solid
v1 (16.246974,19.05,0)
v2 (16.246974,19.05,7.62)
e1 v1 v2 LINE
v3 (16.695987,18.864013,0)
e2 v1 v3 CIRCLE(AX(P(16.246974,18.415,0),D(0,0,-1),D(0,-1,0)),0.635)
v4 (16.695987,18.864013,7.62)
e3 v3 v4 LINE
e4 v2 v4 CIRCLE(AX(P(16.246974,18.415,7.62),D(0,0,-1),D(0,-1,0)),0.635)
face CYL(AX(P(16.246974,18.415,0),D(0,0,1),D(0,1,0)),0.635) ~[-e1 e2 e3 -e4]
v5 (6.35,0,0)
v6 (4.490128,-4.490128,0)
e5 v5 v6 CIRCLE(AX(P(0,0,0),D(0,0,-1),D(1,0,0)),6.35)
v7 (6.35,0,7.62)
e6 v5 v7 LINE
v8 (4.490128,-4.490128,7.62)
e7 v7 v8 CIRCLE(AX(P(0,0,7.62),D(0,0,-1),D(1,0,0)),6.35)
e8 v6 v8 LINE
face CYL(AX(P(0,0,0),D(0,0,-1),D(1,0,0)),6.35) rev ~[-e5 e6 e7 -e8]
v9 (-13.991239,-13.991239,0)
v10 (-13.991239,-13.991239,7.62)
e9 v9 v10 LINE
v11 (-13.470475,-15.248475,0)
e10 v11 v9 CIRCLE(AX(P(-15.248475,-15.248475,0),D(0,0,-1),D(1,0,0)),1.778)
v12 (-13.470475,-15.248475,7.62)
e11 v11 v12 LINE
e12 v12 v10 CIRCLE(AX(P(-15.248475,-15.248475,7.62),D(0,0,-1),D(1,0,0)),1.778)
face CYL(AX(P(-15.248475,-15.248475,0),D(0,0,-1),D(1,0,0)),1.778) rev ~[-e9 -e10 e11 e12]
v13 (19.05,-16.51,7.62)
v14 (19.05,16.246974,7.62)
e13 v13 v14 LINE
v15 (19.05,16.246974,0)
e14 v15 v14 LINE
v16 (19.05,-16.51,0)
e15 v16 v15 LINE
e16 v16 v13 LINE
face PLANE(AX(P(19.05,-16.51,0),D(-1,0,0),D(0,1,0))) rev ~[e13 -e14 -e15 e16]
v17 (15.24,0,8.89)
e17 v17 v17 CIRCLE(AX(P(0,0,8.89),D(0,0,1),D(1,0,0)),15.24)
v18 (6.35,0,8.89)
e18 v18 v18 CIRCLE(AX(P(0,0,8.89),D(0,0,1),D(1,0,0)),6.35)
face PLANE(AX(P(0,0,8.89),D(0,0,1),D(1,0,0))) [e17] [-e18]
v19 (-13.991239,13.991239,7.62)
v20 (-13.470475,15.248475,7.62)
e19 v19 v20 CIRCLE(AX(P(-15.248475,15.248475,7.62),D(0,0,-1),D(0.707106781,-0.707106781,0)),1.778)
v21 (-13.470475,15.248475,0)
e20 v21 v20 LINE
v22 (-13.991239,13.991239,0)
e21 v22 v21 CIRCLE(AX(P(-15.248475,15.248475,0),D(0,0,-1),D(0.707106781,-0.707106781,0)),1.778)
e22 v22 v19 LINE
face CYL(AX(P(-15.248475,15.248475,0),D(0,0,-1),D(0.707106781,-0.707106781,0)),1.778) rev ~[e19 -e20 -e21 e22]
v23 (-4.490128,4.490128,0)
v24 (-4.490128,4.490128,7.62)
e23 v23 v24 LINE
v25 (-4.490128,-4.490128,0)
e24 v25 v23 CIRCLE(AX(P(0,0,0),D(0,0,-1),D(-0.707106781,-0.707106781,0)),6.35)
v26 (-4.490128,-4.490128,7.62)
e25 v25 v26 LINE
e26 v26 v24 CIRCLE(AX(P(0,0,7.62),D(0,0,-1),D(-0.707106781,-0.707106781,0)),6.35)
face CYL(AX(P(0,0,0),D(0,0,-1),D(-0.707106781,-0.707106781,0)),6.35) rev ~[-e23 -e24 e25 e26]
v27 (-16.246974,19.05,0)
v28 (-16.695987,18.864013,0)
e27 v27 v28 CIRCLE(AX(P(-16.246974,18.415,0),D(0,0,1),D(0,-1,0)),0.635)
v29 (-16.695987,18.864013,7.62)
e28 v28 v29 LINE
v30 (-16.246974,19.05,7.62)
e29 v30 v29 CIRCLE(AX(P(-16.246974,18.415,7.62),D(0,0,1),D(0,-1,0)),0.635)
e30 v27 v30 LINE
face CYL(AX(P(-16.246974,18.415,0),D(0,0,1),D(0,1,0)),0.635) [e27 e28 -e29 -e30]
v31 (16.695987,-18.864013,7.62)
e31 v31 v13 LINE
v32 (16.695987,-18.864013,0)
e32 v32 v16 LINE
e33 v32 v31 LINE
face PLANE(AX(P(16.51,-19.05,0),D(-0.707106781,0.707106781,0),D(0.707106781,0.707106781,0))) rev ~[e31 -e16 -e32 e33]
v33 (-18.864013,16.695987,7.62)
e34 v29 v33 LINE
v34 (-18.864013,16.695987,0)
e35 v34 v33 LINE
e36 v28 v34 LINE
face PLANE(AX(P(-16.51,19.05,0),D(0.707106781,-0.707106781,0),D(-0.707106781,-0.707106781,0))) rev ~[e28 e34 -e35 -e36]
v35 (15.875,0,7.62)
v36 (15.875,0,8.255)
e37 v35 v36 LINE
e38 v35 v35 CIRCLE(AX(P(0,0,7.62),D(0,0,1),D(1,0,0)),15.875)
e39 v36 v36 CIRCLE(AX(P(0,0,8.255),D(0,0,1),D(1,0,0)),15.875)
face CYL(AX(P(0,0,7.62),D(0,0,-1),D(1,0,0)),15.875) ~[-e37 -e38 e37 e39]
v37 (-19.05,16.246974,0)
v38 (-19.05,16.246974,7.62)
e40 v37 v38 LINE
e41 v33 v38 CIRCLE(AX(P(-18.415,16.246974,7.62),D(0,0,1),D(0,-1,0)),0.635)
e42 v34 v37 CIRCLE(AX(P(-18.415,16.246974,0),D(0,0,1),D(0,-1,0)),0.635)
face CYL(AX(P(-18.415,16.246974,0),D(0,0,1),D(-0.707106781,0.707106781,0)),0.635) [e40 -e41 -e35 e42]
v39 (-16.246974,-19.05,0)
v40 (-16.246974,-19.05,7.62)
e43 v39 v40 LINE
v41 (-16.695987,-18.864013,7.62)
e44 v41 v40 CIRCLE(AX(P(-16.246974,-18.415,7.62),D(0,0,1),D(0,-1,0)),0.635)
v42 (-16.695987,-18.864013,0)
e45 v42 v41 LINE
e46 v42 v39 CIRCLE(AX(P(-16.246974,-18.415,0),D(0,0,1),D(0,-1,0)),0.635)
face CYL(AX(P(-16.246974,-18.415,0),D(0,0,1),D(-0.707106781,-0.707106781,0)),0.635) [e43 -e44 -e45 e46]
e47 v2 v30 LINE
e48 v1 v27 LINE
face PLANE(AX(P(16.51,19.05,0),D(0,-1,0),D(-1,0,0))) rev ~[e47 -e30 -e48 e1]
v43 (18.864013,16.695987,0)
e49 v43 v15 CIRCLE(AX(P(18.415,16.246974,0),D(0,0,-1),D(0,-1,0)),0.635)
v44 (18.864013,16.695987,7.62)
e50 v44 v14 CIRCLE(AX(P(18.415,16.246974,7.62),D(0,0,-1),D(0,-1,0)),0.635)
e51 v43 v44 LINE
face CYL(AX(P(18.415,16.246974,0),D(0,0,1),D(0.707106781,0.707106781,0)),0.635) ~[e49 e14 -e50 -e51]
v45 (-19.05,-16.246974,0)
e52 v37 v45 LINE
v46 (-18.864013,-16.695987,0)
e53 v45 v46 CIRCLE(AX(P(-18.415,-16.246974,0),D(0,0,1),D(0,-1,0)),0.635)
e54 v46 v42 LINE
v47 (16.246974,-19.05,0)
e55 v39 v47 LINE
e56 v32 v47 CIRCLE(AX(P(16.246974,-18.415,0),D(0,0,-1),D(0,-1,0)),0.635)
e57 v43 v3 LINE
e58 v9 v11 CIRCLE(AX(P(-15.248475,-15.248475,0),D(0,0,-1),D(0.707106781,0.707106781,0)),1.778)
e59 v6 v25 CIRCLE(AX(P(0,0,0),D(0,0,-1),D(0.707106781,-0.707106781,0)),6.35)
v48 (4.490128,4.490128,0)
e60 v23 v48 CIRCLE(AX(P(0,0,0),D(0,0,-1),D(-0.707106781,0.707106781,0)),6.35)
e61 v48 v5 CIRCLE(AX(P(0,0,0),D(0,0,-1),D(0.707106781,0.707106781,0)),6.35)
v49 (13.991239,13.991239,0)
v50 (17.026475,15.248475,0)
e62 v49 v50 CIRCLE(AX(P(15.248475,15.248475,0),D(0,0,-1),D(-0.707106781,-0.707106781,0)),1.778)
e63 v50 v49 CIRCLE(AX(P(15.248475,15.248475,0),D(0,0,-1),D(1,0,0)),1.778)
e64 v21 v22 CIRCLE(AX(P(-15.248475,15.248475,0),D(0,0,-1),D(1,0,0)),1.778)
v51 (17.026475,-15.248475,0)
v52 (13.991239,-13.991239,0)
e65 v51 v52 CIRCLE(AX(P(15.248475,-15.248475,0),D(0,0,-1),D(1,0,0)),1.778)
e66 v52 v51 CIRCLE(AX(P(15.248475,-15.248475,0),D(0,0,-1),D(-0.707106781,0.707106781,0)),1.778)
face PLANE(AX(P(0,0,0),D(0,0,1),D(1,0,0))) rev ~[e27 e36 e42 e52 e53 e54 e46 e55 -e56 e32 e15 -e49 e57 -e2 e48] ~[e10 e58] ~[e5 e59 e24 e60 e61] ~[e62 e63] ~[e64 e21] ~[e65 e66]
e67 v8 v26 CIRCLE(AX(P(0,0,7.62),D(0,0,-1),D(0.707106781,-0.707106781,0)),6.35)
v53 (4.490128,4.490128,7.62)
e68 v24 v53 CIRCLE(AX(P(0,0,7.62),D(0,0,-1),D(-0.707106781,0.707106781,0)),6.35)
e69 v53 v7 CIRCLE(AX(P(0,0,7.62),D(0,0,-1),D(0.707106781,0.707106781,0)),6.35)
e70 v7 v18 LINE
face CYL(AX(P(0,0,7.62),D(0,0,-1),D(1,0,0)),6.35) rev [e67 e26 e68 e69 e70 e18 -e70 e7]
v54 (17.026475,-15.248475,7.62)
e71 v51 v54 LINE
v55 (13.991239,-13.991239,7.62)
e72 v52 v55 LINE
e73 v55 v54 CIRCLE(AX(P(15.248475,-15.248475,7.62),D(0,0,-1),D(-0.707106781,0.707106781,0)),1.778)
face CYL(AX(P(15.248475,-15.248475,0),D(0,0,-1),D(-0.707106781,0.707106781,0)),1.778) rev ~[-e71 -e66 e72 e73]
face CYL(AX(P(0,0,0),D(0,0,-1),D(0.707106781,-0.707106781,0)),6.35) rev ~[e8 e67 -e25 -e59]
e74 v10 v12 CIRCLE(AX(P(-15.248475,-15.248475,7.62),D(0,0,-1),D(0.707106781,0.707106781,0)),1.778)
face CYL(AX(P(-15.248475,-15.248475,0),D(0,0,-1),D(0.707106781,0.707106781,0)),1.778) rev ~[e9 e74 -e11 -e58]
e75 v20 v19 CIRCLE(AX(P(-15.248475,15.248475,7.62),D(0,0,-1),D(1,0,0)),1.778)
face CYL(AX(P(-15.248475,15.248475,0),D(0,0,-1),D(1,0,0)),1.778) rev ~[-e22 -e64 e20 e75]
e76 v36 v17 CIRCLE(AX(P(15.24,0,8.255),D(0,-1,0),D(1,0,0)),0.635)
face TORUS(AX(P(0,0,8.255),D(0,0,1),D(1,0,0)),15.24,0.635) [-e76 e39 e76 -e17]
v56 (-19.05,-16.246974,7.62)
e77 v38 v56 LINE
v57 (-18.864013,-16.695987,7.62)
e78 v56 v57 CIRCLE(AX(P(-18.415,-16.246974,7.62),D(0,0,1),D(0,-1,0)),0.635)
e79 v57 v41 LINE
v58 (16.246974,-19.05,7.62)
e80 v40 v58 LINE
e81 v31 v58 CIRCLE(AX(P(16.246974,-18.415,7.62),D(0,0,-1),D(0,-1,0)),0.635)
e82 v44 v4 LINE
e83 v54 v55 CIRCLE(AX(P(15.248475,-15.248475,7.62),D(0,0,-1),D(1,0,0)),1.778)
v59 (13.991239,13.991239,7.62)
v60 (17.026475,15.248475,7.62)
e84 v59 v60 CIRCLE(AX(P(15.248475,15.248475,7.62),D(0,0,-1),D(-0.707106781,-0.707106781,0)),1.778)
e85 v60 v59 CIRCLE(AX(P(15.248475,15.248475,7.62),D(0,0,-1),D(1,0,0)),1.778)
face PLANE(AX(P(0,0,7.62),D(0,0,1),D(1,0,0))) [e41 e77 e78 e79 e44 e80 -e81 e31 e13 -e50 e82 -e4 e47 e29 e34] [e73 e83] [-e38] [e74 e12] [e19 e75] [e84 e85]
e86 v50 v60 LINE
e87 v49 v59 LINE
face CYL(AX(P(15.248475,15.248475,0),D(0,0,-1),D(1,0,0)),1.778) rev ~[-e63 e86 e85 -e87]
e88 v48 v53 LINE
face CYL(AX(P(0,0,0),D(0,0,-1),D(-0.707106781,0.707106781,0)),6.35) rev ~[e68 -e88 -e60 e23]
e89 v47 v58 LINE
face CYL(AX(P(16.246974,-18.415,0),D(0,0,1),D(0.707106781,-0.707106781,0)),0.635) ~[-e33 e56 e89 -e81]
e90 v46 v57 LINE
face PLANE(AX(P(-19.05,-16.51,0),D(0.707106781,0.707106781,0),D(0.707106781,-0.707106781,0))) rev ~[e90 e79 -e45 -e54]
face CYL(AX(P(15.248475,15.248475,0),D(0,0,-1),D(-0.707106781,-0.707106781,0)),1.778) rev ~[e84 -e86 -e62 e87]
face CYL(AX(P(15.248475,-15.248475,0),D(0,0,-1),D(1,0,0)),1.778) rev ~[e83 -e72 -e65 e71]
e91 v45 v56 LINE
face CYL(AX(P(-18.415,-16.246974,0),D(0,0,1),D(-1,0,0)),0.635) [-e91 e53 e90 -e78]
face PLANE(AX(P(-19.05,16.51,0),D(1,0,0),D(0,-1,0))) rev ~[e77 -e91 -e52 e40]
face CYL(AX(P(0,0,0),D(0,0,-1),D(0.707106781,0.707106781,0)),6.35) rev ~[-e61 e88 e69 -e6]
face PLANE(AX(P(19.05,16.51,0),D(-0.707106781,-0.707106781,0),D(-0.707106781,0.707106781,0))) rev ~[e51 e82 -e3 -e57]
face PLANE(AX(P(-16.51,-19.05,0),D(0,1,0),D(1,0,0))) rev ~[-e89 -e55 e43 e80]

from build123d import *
from build123d import SkipClean  # not in build123d's __all__

# Parameters (mm, degrees)
F1_DEPTH = 7.62
F2_R     = 15.875
F2_R_2   = 6.35
F3_DEPTH = 1.27
F4_R     = 0.635


with BuildPart() as f1:
    # F0 (on Top) → F1 (new body)
    with BuildSketch(Plane.XY):
        Polygon((16.51, 19.05), (-16.51, 19.05), (-19.05, 16.51), (-19.05, -16.51), (-16.51, -19.05), (16.51, -19.05), (19.05, -16.51), (19.05, 0), (19.05, 16.51), align=None)
        with BuildLine():
            ThreePointArc((-13.4704748936, -15.2484748936), (-16.8911327024, -15.9288860363), (-13.9912390366, -13.9912390366))
            ThreePointArc((-13.9912390366, -13.9912390366), (-13.6058170848, -14.5680637508), (-13.4704748936, -15.2484748936))
        make_face(mode=Mode.SUBTRACT)
        with BuildLine():
            ThreePointArc((17.0264748936, -15.2484748936), (14.5680637508, -16.8911327024), (13.9912390366, -13.9912390366))
            ThreePointArc((13.9912390366, -13.9912390366), (15.9288860363, -13.6058170848), (17.0264748936, -15.2484748936))
        make_face(mode=Mode.SUBTRACT)
        with BuildLine():
            ThreePointArc((-13.4704748936, 15.2484748936), (-13.6058170848, 14.5680637508), (-13.9912390366, 13.9912390366))
            ThreePointArc((-13.9912390366, 13.9912390366), (-16.8911327024, 15.9288860363), (-13.4704748936, 15.2484748936))
        make_face(mode=Mode.SUBTRACT)
        with BuildLine():
            ThreePointArc((4.4901280605, 4.4901280605), (5.8666350314, 2.4300397955), (6.35, 0))
            ThreePointArc((6.35, 0), (5.8666350314, -2.4300397955), (4.4901280605, -4.4901280605))
            ThreePointArc((4.4901280605, -4.4901280605), (0, -6.35), (-4.4901280605, -4.4901280605))
            ThreePointArc((-4.4901280605, -4.4901280605), (-6.35, 0), (-4.4901280605, 4.4901280605))
            ThreePointArc((-4.4901280605, 4.4901280605), (0, 6.35), (4.4901280605, 4.4901280605))
        make_face(mode=Mode.SUBTRACT)
        with BuildLine():
            ThreePointArc((17.0264748936, 15.2484748936), (15.9288860363, 13.6058170848), (13.9912390366, 13.9912390366))
            ThreePointArc((13.9912390366, 13.9912390366), (14.5680637508, 16.8911327024), (17.0264748936, 15.2484748936))
        make_face(mode=Mode.SUBTRACT)
    extrude(amount=F1_DEPTH)

    # F2 (on face) → F3 (join)
    with BuildSketch(Plane.XY.offset(7.62)):
        Circle(F2_R)
        Circle(F2_R_2, mode=Mode.SUBTRACT)
    with SkipClean():  # cleaning this boolean's faces spoils the solid; the shape is the same uncleaned
        extrude(amount=F3_DEPTH)

    # F4
    f4_edges = [f1.edges().sort_by_distance(p)[0] for p in [
        (-15.875, 0, 8.89),
        (-19.05, 16.51, 3.81),
        (-19.05, -16.51, 3.81),
        (-16.51, -19.05, 3.81),
        (16.51, -19.05, 3.81),
        (19.05, 16.51, 3.81),
        (16.51, 19.05, 3.81),
        (-16.51, 19.05, 3.81),
    ]]
    fillet(f4_edges, radius=F4_R)


solid = f1.part
